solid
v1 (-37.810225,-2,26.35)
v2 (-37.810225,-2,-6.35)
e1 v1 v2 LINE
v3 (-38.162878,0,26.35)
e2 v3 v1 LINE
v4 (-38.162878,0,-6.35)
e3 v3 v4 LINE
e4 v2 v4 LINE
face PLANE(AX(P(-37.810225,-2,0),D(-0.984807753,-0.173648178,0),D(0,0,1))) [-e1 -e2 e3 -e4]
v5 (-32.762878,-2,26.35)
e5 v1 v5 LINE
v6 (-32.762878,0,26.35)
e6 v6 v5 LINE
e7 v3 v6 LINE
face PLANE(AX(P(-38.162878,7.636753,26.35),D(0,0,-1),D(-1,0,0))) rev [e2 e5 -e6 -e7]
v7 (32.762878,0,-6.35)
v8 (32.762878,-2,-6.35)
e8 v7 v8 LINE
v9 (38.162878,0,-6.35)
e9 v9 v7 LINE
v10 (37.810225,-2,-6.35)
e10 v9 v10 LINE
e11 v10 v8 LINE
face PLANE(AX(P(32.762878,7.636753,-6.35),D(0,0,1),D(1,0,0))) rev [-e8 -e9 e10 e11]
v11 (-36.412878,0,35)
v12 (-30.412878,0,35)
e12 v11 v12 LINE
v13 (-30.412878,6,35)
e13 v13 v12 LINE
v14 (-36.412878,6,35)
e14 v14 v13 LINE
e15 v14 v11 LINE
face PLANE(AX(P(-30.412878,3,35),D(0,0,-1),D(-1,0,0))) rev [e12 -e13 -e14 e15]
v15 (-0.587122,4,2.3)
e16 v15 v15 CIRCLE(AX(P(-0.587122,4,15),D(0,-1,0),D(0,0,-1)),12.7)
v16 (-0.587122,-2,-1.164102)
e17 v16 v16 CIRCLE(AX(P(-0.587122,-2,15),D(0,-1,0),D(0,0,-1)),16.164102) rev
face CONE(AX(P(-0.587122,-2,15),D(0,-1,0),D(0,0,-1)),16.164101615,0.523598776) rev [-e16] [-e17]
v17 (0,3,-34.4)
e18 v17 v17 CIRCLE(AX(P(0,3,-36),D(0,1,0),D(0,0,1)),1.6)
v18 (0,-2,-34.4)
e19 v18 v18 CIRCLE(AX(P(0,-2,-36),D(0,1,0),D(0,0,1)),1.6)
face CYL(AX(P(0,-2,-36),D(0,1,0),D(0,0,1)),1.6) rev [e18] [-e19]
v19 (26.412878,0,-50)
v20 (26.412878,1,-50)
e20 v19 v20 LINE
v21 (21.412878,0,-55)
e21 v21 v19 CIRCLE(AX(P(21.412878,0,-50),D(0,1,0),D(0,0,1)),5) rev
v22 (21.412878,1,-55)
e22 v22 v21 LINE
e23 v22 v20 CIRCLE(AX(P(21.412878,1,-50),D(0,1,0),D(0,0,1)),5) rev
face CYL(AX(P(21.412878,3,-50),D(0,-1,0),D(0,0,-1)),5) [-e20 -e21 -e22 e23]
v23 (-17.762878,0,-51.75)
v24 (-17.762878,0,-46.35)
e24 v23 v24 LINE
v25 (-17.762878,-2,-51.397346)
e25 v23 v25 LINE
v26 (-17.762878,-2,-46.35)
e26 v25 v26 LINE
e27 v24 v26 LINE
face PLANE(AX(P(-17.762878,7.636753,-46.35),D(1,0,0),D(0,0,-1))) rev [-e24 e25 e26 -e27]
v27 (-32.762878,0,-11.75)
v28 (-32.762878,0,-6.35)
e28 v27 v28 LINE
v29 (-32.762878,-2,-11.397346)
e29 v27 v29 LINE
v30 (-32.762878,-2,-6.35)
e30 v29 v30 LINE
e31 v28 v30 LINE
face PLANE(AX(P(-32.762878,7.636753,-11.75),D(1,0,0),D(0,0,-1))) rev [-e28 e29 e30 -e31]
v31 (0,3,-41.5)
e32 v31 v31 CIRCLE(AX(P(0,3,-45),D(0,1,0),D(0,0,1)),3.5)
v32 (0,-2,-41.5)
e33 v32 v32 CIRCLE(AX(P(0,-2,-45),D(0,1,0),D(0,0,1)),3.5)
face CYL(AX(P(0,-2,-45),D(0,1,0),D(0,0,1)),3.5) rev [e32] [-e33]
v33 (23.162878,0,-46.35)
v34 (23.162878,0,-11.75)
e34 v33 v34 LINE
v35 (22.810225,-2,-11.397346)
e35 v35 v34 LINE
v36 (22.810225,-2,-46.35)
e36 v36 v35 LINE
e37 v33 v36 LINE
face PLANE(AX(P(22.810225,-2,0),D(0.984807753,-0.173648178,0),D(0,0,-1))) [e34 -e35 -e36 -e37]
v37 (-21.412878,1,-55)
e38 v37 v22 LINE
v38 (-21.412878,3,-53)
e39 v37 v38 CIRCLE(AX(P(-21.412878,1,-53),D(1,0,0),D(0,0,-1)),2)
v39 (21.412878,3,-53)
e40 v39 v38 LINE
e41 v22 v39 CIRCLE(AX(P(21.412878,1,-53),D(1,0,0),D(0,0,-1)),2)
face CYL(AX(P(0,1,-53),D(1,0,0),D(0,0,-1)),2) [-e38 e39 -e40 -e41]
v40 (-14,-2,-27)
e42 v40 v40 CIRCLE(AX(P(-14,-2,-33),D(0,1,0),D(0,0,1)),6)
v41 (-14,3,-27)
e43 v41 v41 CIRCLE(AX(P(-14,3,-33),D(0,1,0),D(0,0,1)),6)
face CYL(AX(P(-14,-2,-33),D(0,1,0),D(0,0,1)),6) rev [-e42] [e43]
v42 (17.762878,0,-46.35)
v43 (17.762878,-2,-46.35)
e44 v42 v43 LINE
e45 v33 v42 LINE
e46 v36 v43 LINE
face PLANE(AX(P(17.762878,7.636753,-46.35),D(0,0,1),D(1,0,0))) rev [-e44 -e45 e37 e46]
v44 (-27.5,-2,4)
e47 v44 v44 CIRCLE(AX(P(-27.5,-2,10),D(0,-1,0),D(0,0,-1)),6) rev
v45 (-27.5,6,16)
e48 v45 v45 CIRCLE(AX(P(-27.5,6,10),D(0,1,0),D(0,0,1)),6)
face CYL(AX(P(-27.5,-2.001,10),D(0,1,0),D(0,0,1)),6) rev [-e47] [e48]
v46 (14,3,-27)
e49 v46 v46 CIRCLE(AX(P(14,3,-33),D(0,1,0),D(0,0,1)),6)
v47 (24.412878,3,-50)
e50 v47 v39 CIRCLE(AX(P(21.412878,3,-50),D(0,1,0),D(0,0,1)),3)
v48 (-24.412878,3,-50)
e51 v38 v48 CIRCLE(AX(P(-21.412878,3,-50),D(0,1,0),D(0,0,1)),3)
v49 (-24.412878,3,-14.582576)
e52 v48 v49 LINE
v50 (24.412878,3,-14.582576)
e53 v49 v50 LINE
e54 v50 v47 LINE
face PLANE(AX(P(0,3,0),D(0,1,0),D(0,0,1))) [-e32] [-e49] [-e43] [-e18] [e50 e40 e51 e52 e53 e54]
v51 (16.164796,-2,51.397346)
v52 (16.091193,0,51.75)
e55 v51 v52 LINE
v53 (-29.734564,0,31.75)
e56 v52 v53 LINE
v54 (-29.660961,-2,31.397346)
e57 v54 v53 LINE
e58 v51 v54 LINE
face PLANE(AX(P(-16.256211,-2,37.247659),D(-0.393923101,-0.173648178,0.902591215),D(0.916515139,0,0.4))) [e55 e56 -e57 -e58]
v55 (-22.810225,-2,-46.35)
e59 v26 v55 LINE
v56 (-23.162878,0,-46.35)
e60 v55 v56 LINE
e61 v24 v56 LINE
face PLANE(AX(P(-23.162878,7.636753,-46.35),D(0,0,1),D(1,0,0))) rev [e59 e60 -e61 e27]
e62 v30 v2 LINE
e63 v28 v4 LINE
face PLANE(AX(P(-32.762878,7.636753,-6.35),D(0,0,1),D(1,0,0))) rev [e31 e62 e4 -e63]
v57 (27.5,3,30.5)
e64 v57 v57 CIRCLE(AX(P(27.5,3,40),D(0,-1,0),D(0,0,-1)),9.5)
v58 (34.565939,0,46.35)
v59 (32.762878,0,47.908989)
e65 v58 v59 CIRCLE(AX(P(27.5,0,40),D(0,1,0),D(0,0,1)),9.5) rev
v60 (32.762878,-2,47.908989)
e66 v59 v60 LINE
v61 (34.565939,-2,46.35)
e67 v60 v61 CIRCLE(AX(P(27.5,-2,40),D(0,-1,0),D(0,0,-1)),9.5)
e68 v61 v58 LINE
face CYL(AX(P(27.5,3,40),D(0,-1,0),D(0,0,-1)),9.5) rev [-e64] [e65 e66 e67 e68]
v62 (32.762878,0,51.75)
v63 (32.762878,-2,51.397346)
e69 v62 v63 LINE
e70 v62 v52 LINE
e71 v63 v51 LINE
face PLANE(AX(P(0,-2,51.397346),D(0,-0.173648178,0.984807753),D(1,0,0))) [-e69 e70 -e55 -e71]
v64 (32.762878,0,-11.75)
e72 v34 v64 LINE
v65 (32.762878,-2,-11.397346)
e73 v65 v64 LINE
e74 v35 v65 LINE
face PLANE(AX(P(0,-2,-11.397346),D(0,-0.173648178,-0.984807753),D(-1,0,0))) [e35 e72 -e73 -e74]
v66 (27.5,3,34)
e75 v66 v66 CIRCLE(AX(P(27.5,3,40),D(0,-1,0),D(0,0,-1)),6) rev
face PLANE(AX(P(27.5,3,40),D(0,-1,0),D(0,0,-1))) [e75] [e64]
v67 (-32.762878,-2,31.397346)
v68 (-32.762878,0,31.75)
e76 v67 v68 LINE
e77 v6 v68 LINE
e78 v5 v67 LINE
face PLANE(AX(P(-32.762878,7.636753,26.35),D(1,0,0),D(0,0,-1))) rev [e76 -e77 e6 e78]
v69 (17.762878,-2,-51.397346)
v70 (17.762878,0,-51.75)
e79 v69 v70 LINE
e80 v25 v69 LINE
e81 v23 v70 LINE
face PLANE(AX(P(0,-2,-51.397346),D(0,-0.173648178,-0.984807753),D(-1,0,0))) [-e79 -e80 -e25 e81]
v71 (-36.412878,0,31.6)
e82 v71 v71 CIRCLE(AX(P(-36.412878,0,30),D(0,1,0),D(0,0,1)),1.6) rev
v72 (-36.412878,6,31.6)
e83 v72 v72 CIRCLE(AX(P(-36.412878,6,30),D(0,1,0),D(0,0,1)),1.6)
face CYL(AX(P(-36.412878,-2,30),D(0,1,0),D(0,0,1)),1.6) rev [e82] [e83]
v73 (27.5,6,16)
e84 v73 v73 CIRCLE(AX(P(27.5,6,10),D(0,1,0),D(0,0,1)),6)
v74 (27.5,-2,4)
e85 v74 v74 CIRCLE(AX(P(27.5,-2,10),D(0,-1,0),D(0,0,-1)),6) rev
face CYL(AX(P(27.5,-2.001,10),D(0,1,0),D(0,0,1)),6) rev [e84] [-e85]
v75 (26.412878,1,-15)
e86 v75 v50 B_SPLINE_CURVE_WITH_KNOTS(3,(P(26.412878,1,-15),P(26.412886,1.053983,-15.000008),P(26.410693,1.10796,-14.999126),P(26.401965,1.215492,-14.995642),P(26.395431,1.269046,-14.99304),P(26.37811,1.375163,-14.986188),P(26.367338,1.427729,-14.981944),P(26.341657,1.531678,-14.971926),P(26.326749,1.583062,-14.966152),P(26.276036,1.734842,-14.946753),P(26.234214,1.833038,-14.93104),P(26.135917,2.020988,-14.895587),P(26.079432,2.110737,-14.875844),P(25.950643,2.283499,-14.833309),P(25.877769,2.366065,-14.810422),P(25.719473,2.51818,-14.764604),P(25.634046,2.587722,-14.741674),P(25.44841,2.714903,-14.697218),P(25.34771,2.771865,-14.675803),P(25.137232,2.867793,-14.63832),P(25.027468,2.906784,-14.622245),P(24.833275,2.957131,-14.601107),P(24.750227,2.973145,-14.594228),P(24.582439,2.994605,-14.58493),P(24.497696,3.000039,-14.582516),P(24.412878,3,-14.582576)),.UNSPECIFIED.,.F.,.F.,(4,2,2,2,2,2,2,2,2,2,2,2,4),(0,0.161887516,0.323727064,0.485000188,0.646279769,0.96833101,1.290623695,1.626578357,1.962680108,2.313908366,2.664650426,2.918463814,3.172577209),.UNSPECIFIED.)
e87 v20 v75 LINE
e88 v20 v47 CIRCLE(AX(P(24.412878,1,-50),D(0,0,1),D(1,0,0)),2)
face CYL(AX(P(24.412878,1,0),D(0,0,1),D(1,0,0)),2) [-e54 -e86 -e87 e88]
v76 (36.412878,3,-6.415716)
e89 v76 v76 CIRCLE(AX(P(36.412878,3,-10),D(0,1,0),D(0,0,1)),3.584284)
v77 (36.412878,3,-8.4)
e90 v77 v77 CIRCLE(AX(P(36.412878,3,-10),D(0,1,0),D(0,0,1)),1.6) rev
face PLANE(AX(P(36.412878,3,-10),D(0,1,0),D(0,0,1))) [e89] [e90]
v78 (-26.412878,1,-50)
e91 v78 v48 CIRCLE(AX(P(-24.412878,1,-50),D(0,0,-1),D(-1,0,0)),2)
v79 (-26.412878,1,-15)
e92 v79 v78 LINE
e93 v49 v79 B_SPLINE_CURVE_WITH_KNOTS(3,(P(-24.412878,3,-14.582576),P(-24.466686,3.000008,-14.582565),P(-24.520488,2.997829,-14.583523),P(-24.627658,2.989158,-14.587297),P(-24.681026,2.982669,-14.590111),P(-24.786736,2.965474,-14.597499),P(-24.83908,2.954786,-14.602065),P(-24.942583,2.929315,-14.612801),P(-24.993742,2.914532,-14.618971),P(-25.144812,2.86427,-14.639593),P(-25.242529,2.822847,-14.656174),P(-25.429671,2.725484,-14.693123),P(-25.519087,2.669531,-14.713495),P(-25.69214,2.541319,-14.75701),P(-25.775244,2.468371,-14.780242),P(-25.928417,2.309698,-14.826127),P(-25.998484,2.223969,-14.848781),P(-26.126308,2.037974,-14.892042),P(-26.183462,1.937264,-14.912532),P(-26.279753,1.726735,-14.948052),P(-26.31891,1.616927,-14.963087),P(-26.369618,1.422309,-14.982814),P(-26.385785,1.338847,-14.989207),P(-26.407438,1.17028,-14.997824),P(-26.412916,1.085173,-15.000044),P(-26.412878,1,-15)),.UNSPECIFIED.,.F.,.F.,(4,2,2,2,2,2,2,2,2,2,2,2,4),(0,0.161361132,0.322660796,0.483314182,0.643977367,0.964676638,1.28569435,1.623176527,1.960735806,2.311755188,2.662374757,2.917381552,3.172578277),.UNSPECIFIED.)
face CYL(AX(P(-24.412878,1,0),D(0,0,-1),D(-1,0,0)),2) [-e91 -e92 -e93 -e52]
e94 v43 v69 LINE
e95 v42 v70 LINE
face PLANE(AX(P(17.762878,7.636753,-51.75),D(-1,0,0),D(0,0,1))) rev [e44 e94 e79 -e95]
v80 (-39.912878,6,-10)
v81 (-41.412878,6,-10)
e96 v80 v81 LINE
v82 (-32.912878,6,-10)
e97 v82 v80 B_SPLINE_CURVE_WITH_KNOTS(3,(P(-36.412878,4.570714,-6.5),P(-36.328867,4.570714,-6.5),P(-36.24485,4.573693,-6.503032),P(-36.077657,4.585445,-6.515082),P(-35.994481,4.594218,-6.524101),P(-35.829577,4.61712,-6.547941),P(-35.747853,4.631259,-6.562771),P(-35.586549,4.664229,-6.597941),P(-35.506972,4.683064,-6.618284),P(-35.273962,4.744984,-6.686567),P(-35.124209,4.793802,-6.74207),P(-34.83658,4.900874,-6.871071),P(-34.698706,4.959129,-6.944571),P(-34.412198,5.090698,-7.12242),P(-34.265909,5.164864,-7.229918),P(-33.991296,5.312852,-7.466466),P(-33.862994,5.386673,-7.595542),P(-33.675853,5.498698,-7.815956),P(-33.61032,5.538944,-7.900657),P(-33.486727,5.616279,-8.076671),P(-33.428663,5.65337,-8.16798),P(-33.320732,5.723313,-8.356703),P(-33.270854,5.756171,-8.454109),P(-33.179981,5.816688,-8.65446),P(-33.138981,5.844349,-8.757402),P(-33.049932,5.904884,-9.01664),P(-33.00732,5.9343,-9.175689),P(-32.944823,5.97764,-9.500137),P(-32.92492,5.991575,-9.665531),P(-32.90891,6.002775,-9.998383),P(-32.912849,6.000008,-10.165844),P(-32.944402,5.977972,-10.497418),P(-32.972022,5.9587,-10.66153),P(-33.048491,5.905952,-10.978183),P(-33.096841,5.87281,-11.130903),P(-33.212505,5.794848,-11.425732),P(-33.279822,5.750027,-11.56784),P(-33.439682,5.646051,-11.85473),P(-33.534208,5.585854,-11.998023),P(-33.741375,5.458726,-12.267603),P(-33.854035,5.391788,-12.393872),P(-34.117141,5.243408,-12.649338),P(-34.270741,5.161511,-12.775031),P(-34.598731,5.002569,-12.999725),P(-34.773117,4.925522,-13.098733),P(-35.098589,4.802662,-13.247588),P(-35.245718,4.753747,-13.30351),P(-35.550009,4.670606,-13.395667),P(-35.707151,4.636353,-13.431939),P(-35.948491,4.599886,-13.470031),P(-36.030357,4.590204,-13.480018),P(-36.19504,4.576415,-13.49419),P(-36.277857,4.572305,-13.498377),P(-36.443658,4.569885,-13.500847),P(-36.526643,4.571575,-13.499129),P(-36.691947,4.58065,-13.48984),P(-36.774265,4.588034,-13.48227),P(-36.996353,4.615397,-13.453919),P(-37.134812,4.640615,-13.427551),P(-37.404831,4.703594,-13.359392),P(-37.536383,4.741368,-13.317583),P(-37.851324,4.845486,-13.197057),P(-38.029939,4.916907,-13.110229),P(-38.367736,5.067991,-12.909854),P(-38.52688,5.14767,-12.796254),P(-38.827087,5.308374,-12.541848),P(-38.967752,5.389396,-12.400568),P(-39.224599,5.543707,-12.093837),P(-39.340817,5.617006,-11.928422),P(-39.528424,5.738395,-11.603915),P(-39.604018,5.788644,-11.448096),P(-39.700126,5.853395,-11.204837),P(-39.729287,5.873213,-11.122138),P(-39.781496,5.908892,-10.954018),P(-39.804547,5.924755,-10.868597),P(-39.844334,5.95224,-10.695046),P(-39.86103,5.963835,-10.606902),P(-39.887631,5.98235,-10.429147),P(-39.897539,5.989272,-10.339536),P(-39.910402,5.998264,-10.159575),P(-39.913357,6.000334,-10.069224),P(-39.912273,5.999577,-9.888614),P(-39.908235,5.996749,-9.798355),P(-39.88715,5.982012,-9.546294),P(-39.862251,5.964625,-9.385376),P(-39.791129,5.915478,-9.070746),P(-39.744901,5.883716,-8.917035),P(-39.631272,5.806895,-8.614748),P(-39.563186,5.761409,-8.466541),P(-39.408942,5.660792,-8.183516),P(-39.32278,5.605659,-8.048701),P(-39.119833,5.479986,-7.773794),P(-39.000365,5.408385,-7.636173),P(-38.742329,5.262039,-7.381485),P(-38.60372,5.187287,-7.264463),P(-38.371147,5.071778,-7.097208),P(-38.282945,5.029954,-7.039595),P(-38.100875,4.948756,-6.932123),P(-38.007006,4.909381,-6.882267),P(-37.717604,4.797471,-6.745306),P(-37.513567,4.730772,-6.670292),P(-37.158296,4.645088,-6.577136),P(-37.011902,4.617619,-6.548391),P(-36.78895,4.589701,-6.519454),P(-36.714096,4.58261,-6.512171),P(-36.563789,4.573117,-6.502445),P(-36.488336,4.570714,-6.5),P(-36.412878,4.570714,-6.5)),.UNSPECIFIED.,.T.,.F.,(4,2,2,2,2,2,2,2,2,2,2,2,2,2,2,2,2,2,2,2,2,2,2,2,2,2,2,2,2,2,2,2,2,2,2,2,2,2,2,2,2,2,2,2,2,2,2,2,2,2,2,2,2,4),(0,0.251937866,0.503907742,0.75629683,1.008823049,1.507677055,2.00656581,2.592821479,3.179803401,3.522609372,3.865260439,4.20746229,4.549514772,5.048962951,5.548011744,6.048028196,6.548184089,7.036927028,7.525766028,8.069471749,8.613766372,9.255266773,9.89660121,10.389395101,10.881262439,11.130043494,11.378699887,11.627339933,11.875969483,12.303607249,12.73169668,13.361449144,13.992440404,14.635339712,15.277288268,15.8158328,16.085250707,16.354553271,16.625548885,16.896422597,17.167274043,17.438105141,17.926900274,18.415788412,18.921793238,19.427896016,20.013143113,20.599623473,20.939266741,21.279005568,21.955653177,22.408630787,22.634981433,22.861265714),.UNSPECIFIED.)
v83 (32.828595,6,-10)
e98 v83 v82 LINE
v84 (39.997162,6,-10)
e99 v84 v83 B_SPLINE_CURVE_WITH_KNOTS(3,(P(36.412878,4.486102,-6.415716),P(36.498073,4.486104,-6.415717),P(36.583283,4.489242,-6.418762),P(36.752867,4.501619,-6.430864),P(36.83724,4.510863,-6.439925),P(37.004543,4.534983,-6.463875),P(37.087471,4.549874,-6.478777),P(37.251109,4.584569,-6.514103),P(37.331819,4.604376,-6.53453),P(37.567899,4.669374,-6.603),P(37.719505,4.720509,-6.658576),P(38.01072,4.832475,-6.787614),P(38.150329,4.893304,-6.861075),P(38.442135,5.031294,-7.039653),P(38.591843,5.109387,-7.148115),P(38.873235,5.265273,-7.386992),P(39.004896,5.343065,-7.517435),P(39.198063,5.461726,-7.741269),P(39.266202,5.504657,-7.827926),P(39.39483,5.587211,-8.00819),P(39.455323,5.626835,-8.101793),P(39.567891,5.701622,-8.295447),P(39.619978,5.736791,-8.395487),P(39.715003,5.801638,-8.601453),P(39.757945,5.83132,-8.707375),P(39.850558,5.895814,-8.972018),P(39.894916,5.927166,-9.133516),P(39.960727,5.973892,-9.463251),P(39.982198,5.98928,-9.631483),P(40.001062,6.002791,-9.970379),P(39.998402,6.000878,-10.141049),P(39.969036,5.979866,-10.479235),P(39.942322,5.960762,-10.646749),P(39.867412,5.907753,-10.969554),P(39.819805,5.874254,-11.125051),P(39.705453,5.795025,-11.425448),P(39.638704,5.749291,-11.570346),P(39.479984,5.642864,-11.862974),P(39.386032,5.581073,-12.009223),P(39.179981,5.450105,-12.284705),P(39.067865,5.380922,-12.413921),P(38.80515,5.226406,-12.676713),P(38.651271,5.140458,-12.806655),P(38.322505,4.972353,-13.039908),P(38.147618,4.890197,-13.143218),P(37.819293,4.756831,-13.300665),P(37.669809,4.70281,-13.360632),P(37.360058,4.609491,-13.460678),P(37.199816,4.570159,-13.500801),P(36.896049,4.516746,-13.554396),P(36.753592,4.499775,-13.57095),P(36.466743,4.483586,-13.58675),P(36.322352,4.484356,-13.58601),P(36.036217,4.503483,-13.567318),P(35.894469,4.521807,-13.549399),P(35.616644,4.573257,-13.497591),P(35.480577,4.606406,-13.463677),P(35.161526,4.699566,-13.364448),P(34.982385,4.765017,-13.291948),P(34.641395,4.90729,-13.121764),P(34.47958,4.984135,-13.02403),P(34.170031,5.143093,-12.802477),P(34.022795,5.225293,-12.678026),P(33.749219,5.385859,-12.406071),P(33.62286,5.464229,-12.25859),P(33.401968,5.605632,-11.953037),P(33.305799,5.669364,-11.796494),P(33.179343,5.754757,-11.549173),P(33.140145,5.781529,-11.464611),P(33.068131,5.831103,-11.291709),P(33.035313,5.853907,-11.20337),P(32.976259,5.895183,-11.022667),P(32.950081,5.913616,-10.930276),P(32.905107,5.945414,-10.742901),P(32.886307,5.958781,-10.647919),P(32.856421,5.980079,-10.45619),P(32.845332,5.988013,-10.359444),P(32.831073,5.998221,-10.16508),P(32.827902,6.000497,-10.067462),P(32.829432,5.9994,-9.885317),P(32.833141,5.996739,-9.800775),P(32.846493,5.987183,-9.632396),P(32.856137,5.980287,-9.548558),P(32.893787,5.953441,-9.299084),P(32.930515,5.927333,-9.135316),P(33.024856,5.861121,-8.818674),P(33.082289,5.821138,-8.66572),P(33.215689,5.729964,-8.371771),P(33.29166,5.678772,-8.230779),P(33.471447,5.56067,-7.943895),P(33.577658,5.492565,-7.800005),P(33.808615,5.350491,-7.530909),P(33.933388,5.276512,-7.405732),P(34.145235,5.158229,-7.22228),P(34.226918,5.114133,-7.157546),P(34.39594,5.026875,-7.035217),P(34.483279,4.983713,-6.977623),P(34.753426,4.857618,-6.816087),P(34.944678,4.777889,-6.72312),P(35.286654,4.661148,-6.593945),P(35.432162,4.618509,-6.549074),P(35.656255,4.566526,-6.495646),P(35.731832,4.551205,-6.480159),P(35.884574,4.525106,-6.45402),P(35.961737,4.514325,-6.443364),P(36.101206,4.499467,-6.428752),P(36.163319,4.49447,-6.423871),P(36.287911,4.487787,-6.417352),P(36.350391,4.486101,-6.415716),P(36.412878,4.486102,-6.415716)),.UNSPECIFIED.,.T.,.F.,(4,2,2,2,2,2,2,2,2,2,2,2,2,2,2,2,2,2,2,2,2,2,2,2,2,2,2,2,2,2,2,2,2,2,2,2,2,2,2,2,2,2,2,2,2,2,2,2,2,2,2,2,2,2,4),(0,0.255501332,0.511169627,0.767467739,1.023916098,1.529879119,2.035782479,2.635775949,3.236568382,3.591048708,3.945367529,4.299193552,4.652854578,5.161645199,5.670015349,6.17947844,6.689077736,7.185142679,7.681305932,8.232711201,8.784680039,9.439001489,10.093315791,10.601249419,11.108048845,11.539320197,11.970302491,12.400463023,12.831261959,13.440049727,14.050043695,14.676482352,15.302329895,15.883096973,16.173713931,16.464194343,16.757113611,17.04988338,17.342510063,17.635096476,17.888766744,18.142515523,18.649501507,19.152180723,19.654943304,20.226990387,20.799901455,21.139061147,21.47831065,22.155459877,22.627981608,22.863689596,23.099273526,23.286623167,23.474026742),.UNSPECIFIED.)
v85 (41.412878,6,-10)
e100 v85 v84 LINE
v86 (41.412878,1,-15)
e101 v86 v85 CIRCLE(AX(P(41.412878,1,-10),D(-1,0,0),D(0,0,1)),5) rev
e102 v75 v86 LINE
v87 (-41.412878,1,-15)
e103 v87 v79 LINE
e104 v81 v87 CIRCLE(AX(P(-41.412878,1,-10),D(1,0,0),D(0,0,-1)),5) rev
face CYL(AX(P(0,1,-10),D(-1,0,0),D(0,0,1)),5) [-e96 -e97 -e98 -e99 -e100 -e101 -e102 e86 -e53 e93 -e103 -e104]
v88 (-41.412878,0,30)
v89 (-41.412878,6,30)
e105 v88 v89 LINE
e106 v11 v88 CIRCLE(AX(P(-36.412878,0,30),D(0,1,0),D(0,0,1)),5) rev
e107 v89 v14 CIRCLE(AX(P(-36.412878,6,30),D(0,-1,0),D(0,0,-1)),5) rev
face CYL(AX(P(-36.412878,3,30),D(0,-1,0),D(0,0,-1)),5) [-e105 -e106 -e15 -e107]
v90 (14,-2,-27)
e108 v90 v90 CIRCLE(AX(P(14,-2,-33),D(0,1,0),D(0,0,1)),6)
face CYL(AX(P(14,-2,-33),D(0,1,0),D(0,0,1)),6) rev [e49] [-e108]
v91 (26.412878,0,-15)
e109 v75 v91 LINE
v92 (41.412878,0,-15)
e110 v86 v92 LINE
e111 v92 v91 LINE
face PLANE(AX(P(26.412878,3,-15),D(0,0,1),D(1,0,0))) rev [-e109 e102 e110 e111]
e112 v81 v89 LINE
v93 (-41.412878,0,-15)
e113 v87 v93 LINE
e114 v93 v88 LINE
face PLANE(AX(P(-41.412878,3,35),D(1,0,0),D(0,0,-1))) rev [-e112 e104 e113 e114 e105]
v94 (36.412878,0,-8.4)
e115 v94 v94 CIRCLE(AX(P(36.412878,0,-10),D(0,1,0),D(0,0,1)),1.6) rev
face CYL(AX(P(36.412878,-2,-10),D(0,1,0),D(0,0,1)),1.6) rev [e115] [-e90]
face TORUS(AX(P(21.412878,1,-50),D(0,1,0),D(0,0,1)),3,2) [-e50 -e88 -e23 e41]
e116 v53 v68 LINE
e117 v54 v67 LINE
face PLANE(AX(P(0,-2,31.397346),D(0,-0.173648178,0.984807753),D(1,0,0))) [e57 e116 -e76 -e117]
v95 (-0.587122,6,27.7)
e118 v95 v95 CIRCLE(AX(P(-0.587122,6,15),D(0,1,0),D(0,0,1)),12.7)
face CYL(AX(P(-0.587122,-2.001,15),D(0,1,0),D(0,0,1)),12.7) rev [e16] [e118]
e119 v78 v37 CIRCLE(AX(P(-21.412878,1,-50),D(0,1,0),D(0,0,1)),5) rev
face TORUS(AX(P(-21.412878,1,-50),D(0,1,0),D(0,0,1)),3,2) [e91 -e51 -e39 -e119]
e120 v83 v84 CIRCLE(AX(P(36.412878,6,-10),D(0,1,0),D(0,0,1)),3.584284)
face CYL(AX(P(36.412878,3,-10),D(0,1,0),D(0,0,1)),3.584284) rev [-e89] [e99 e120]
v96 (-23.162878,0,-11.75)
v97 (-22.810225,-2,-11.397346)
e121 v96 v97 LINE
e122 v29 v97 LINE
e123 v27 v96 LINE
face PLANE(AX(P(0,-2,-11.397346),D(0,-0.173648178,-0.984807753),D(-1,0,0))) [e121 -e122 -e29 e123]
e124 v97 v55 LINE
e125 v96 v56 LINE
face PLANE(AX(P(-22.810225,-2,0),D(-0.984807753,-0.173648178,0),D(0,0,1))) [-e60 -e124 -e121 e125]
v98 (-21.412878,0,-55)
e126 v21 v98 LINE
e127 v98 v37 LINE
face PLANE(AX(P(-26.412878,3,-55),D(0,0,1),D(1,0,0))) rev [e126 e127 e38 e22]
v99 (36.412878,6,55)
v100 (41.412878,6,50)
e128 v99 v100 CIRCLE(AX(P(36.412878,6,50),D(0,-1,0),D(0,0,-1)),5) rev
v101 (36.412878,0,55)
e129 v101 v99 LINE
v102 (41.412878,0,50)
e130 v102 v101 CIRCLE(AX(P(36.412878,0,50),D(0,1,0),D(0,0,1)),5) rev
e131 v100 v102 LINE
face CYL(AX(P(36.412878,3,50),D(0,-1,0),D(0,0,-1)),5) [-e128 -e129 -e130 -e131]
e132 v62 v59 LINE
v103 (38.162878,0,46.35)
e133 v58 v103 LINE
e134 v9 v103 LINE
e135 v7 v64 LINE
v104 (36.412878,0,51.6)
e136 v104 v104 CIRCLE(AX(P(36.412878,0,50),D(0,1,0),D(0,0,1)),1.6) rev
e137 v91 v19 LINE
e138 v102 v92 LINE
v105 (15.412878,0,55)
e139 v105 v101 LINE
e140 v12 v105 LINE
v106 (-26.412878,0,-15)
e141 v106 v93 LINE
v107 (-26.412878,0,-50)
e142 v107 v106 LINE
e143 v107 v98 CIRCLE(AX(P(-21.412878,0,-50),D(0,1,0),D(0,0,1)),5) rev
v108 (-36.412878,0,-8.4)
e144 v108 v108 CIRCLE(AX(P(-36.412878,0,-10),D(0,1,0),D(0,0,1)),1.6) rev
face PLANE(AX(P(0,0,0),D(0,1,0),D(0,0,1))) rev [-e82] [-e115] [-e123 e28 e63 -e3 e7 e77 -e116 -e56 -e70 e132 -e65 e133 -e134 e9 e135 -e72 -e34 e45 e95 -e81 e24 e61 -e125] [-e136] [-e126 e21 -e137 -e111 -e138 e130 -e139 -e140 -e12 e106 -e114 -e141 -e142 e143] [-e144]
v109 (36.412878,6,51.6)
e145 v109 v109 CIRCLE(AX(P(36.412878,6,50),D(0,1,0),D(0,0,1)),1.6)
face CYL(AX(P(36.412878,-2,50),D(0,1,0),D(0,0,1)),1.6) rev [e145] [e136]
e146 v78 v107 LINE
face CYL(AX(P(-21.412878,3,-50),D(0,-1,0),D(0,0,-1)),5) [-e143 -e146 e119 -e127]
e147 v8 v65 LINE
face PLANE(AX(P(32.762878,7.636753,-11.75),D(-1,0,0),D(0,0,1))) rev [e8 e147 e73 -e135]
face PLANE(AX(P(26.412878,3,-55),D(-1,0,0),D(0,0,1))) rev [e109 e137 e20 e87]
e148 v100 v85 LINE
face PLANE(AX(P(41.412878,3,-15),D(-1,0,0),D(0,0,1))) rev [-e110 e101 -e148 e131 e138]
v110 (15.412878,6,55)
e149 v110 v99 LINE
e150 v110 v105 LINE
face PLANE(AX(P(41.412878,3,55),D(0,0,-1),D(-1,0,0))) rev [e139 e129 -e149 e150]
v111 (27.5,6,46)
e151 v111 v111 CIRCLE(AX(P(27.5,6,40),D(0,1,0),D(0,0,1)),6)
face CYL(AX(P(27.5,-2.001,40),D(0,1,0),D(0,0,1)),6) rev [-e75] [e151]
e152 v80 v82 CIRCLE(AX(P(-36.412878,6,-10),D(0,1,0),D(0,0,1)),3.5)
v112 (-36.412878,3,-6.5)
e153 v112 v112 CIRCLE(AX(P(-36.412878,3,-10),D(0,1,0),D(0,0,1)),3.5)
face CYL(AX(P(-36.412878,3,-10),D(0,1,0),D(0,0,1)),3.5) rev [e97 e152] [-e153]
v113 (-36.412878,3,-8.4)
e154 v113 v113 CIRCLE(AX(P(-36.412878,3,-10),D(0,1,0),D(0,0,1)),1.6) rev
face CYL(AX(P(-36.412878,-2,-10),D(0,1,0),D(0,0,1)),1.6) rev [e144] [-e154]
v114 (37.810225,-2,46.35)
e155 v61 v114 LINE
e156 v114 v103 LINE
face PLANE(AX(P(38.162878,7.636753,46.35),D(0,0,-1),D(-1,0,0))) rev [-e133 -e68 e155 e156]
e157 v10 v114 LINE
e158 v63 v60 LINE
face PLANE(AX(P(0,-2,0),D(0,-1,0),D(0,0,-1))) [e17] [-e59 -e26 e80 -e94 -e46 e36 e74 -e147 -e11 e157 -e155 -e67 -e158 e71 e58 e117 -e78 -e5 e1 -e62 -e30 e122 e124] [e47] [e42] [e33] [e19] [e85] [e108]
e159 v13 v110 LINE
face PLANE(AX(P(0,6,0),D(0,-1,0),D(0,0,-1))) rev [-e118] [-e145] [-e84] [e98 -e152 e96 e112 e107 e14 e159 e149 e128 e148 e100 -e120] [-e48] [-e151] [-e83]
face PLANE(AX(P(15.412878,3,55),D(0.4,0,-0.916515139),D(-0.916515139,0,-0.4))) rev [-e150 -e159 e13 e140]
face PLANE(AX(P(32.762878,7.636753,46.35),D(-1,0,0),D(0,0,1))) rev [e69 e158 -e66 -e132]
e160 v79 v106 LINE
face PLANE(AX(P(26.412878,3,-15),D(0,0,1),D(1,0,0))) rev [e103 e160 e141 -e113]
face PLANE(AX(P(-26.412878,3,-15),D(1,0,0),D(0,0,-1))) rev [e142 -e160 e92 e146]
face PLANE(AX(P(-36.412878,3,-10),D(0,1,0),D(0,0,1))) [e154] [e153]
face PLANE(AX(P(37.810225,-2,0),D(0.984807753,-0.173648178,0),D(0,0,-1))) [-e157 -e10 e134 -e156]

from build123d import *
from OCP.BRepFilletAPI import BRepFilletAPI_MakeChamfer

# Parameters (mm, degrees)
BOSS_EXTRUDE1_DEPTH = 3
BOSS_EXTRUDE2_DEPTH = 2
CHAMFER1_SIZE       = 2
CHAMFER1_SIZE_2     = 0.352653961
SKETCH3_R           = 6
SKETCH3_R_2         = 3.5
SKETCH3_R_3         = 1.6
CUT_EXTRUDE1_DEPTH  = 70.029171396
BOSS_EXTRUDE3_DEPTH = 3
FILLET1_R           = 5
CUT_EXTRUDE3_REACH  = 71.311
SKETCH6_R           = 12.7
SKETCH6_R_2         = 6
SKETCH7_R           = 9.5
CUT_EXTRUDE4_DEPTH  = 5
CHAMFER2_SIZE       = 6
CHAMFER2_SIZE2      = 3.464101615
FILLET2_R           = 5
FILLET3_R           = 2
SKETCH9_R           = 1.6
CUT_EXTRUDE5_DEPTH  = 70.311085058
SKETCH10_R          = 3.5
SKETCH10_R_2        = 3.584283701
CUT_EXTRUDE6_DEPTH  = 3
SKETCH11_W          = 5.4
SKETCH11_H          = 5.4
CUT_EXTRUDE7_DEPTH  = 2


# Some blends are built 0.0001 mm under size
with BuildPart() as part:
    # Sketch1 → Boss-Extrude1 (new body)
    with BuildSketch(Plane(origin=(0, 0, 0), x_dir=(1, 0, 0), z_dir=(0, 1, 0))):
        Polygon((-26.412878475, 15), (-26.412878475, 55), (26.412878475, 55), (26.412878475, 15), (41.412878475, 15), (41.412878475, -55), (15.412878475, -55), (-30.412878475, -35), (-41.412878475, -35), (-41.412878475, 15), align=None)
    extrude(amount=BOSS_EXTRUDE1_DEPTH)

    # Sketch2 → Boss-Extrude2 (add)
    with BuildSketch(Plane.XZ):
        Polygon((-38.162878475, 31.75), (-38.162878475, -11.75), (-23.162878475, -11.75), (-23.162878475, -51.75), (23.162878475, -51.75), (23.162878475, -11.75), (38.162878475, -11.75), (38.162878475, 51.75), (16.09119297, 51.75), (-29.734563979, 31.75), align=None)
    extrude(amount=BOSS_EXTRUDE2_DEPTH)

    # Chamfer1
    chamfer1_edges_1 = [part.edges().sort_by_distance(p)[0] for p in [
        (-33.948721227, -2, 31.75),
    ]]
    chamfer1_side_1 = [part.faces().sort_by_distance(p)[0] for p in [
        (-33.948721227, -1.992946921, 31.75),
    ]]
    chamfer1_edges_2 = [part.edges().sort_by_distance(p)[0] for p in [
        (-6.821685504, -2, 41.75),
    ]]
    chamfer1_side_2 = [part.faces().sort_by_distance(p)[0] for p in [
        (-6.821685504, -1.992946921, 41.75),
    ]]
    chamfer1_edges_3 = [part.edges().sort_by_distance(p)[0] for p in [
        (27.127035723, -2, 51.75),
    ]]
    chamfer1_side_3 = [part.faces().sort_by_distance(p)[0] for p in [
        (27.127035723, -1.992946921, 51.75),
    ]]
    chamfer1_edges_4 = [part.edges().sort_by_distance(p)[0] for p in [
        (38.162878475, -2, 20),
    ]]
    chamfer1_side_4 = [part.faces().sort_by_distance(p)[0] for p in [
        (38.162878475, -1.992946921, 20),
    ]]
    chamfer1_edges_5 = [part.edges().sort_by_distance(p)[0] for p in [
        (30.662878475, -2, -11.75),
    ]]
    chamfer1_side_5 = [part.faces().sort_by_distance(p)[0] for p in [
        (30.662878475, -1.992946921, -11.75),
    ]]
    chamfer1_edges_6 = [part.edges().sort_by_distance(p)[0] for p in [
        (23.162878475, -2, -31.75),
    ]]
    chamfer1_side_6 = [part.faces().sort_by_distance(p)[0] for p in [
        (23.162878475, -1.992946921, -31.75),
    ]]
    chamfer1_edges_7 = [part.edges().sort_by_distance(p)[0] for p in [
        (0, -2, -51.75),
    ]]
    chamfer1_side_7 = [part.faces().sort_by_distance(p)[0] for p in [
        (0, -1.992946921, -51.75),
    ]]
    chamfer1_edges_8 = [part.edges().sort_by_distance(p)[0] for p in [
        (-23.162878475, -2, -31.75),
    ]]
    chamfer1_side_8 = [part.faces().sort_by_distance(p)[0] for p in [
        (-23.162878475, -1.992946921, -31.75),
    ]]
    chamfer1_edges_9 = [part.edges().sort_by_distance(p)[0] for p in [
        (-30.662878475, -2, -11.75),
    ]]
    chamfer1_side_9 = [part.faces().sort_by_distance(p)[0] for p in [
        (-30.662878475, -1.992946921, -11.75),
    ]]
    chamfer1_edges_10 = [part.edges().sort_by_distance(p)[0] for p in [
        (-38.162878475, -2, 10),
    ]]
    chamfer1_side_10 = [part.faces().sort_by_distance(p)[0] for p in [
        (-38.162878475, -1.992946921, 10),
    ]]
    chamfer1 = BRepFilletAPI_MakeChamfer(part.part.solid().wrapped)
    for e in chamfer1_edges_1:
        chamfer1.Add(CHAMFER1_SIZE - 0.0001, CHAMFER1_SIZE_2 - 0.0001, e.wrapped, chamfer1_side_1[0].wrapped)
    for e in chamfer1_edges_2:
        chamfer1.Add(CHAMFER1_SIZE - 0.0001, CHAMFER1_SIZE_2 - 0.0001, e.wrapped, chamfer1_side_2[0].wrapped)
    for e in chamfer1_edges_3:
        chamfer1.Add(CHAMFER1_SIZE - 0.0001, CHAMFER1_SIZE_2 - 0.0001, e.wrapped, chamfer1_side_3[0].wrapped)
    for e in chamfer1_edges_4:
        chamfer1.Add(CHAMFER1_SIZE - 0.0001, CHAMFER1_SIZE_2 - 0.0001, e.wrapped, chamfer1_side_4[0].wrapped)
    for e in chamfer1_edges_5:
        chamfer1.Add(CHAMFER1_SIZE - 0.0001, CHAMFER1_SIZE_2 - 0.0001, e.wrapped, chamfer1_side_5[0].wrapped)
    for e in chamfer1_edges_6:
        chamfer1.Add(CHAMFER1_SIZE - 0.0001, CHAMFER1_SIZE_2 - 0.0001, e.wrapped, chamfer1_side_6[0].wrapped)
    for e in chamfer1_edges_7:
        chamfer1.Add(CHAMFER1_SIZE - 0.0001, CHAMFER1_SIZE_2 - 0.0001, e.wrapped, chamfer1_side_7[0].wrapped)
    for e in chamfer1_edges_8:
        chamfer1.Add(CHAMFER1_SIZE - 0.0001, CHAMFER1_SIZE_2 - 0.0001, e.wrapped, chamfer1_side_8[0].wrapped)
    for e in chamfer1_edges_9:
        chamfer1.Add(CHAMFER1_SIZE - 0.0001, CHAMFER1_SIZE_2 - 0.0001, e.wrapped, chamfer1_side_9[0].wrapped)
    for e in chamfer1_edges_10:
        chamfer1.Add(CHAMFER1_SIZE - 0.0001, CHAMFER1_SIZE_2 - 0.0001, e.wrapped, chamfer1_side_10[0].wrapped)
    add(Compound.cast(chamfer1.Shape()), mode=Mode.REPLACE)  # a hair under: the kernel refuses the full size

    # Sketch3 → Cut-Extrude1 (cut, through all)
    with BuildSketch(Plane(origin=(0, 3, 0), x_dir=(1, 0, 0), z_dir=(0, 1, 0))):
        with Locations(Location((-14, 33, 0), (0, 0, 270))):
            Circle(SKETCH3_R)
        with Locations(Location((14, 33, 0), (0, 0, 270))):
            Circle(SKETCH3_R)
        with Locations(Location((0, 45, 0), (0, 0, 270))):
            Circle(SKETCH3_R_2)
        with Locations(Location((0, 36, 0), (0, 0, 270))):
            Circle(SKETCH3_R_3)
    extrude(amount=-CUT_EXTRUDE1_DEPTH, mode=Mode.SUBTRACT)

    # Sketch4 → Boss-Extrude3 (add)
    with BuildSketch(Plane(origin=(0, 3, 0), x_dir=(1, 0, 0), z_dir=(0, 1, 0))):
        Polygon((-41.412878475, 15), (41.412878475, 15), (41.412878475, -55), (15.412878475, -55), (-30.412878475, -35), (-41.412878475, -35), align=None)
    extrude(amount=BOSS_EXTRUDE3_DEPTH)

    # Fillet1
    # the kernel refuses this fillet: 5 mm, written as the material it takes off along each edge
    with BuildSketch(Plane(origin=(-53.912878475, 6, -15), x_dir=(0, -1, 0), z_dir=(1, 0, 0))) as fillet1_piece_1_section:
        with BuildLine():
            CenterArc((FILLET1_R, -FILLET1_R), FILLET1_R, 90, 90)
            Line((0, -FILLET1_R), (0, 0))
            Line((0, 0), (FILLET1_R, 0))
        make_face()
    fillet1_piece_1 = extrude(amount=107.82575695, mode=Mode.PRIVATE)
    fillet1_piece_1 = split(fillet1_piece_1, bisect_by=Plane(origin=(-40.162878475, 3, -14.94934076), z_dir=(0, -1, 0)), keep=Keep.TOP, mode=Mode.PRIVATE)
    fillet1_piece_1 = split(fillet1_piece_1, bisect_by=Plane(origin=(-26.412878475, 2.291256669, -14.94934076), z_dir=(-1, 0, 0)), keep=Keep.TOP, mode=Mode.PRIVATE)
    add(fillet1_piece_1, mode=Mode.SUBTRACT)
    with BuildSketch(Plane(origin=(-53.912878475, 6, -15), x_dir=(0, -1, 0), z_dir=(1, 0, 0))) as fillet1_piece_2_section:
        with BuildLine():
            CenterArc((FILLET1_R, -FILLET1_R), FILLET1_R, 90, 90)
            Line((0, -FILLET1_R), (0, 0))
            Line((0, 0), (FILLET1_R, 0))
        make_face()
    fillet1_piece_2 = extrude(amount=107.82575695, mode=Mode.PRIVATE)
    fillet1_piece_2 = split(fillet1_piece_2, bisect_by=Plane(origin=(-40.162878475, 3, -13.781274122), z_dir=(0, 1, 0)), keep=Keep.TOP, mode=Mode.PRIVATE)
    fillet1_piece_2 = split(fillet1_piece_2, bisect_by=Plane(origin=(-26.412878475, 5.074749682, -13.781274122), z_dir=(-1, 0, 0)), keep=Keep.TOP, mode=Mode.PRIVATE)
    add(fillet1_piece_2, mode=Mode.SUBTRACT)
    with BuildSketch(Plane(origin=(-53.912878475, 6, -15), x_dir=(0, -1, 0), z_dir=(1, 0, 0))) as fillet1_piece_3_section:
        with BuildLine():
            CenterArc((FILLET1_R, -FILLET1_R), FILLET1_R, 90, 90)
            Line((0, -FILLET1_R), (0, 0))
            Line((0, 0), (FILLET1_R, 0))
        make_face()
    fillet1_piece_3 = extrude(amount=107.82575695, mode=Mode.PRIVATE)
    fillet1_piece_3 = split(fillet1_piece_3, bisect_by=Plane(origin=(0, 3, -13.781274122), z_dir=(0, 1, 0)), keep=Keep.TOP, mode=Mode.PRIVATE)
    fillet1_piece_3 = split(fillet1_piece_3, bisect_by=Plane(origin=(-26.412878475, 5.074749682, -13.781274122), z_dir=(1, 0, 0)), keep=Keep.TOP, mode=Mode.PRIVATE)
    fillet1_piece_3 = split(fillet1_piece_3, bisect_by=Plane(origin=(26.412878475, 5.074749682, -13.781274122), z_dir=(-1, 0, 0)), keep=Keep.TOP, mode=Mode.PRIVATE)
    add(fillet1_piece_3, mode=Mode.SUBTRACT)
    with BuildSketch(Plane(origin=(-53.912878475, 6, -15), x_dir=(0, -1, 0), z_dir=(1, 0, 0))) as fillet1_piece_4_section:
        with BuildLine():
            CenterArc((FILLET1_R, -FILLET1_R), FILLET1_R, 90, 90)
            Line((0, -FILLET1_R), (0, 0))
            Line((0, 0), (FILLET1_R, 0))
        make_face()
    fillet1_piece_4 = extrude(amount=107.82575695, mode=Mode.PRIVATE)
    fillet1_piece_4 = split(fillet1_piece_4, bisect_by=Plane(origin=(40.162878475, 3, -14.94934076), z_dir=(0, -1, 0)), keep=Keep.TOP, mode=Mode.PRIVATE)
    fillet1_piece_4 = split(fillet1_piece_4, bisect_by=Plane(origin=(26.412878475, 2.291256669, -14.94934076), z_dir=(1, 0, 0)), keep=Keep.TOP, mode=Mode.PRIVATE)
    add(fillet1_piece_4, mode=Mode.SUBTRACT)
    with BuildSketch(Plane(origin=(-53.912878475, 6, -15), x_dir=(0, -1, 0), z_dir=(1, 0, 0))) as fillet1_piece_5_section:
        with BuildLine():
            CenterArc((FILLET1_R, -FILLET1_R), FILLET1_R, 90, 90)
            Line((0, -FILLET1_R), (0, 0))
            Line((0, 0), (FILLET1_R, 0))
        make_face()
    fillet1_piece_5 = extrude(amount=107.82575695, mode=Mode.PRIVATE)
    fillet1_piece_5 = split(fillet1_piece_5, bisect_by=Plane(origin=(40.162878475, 3, -13.781274122), z_dir=(0, 1, 0)), keep=Keep.TOP, mode=Mode.PRIVATE)
    fillet1_piece_5 = split(fillet1_piece_5, bisect_by=Plane(origin=(26.412878475, 5.074749682, -13.781274122), z_dir=(1, 0, 0)), keep=Keep.TOP, mode=Mode.PRIVATE)
    add(fillet1_piece_5, mode=Mode.SUBTRACT)

    # Sketch6 → Cut-Extrude3 (cut, up to next)
    with BuildSketch(Plane(origin=(0, 6, 0), x_dir=(1, 0, 0), z_dir=(0, 1, 0)), mode=Mode.PRIVATE) as cut_extrude3_sk1:
        with Locations(Location((-0.587121525, -15, 0), (0, 0, 270))):
            Circle(SKETCH6_R)
    cut_extrude3_tool1 = extrude(cut_extrude3_sk1.sketch, amount=-CUT_EXTRUDE3_REACH, mode=Mode.PRIVATE) & part.part
    # Sketch6 → Cut-Extrude3 (cut, up to next)
    with BuildSketch(Plane(origin=(0, 6, 0), x_dir=(1, 0, 0), z_dir=(0, 1, 0)), mode=Mode.PRIVATE) as cut_extrude3_sk2:
        with Locations(Location((-27.5, -10, 0), (0, 0, 270))):
            Circle(SKETCH6_R_2)
    cut_extrude3_tool2 = extrude(cut_extrude3_sk2.sketch, amount=-CUT_EXTRUDE3_REACH, mode=Mode.PRIVATE) & part.part
    # Sketch6 → Cut-Extrude3 (cut, up to next)
    with BuildSketch(Plane(origin=(0, 6, 0), x_dir=(1, 0, 0), z_dir=(0, 1, 0)), mode=Mode.PRIVATE) as cut_extrude3_sk3:
        with Locations(Location((27.5, -10, 0), (0, 0, 270))):
            Circle(SKETCH6_R_2)
    cut_extrude3_tool3 = extrude(cut_extrude3_sk3.sketch, amount=-CUT_EXTRUDE3_REACH, mode=Mode.PRIVATE) & part.part
    # Sketch6 → Cut-Extrude3 (cut, up to next)
    with BuildSketch(Plane(origin=(0, 6, 0), x_dir=(1, 0, 0), z_dir=(0, 1, 0)), mode=Mode.PRIVATE) as cut_extrude3_sk4:
        with Locations(Location((27.5, -40, 0), (0, 0, 270))):
            Circle(SKETCH6_R_2)
    cut_extrude3_tool4 = extrude(cut_extrude3_sk4.sketch, amount=-CUT_EXTRUDE3_REACH, mode=Mode.PRIVATE) & part.part
    add(cut_extrude3_tool1.solids().sort_by_distance((-0.587122, 6, 15))[0], mode=Mode.SUBTRACT)
    add(cut_extrude3_tool2.solids().sort_by_distance((-27.5, 6, 10))[0], mode=Mode.SUBTRACT)
    add(cut_extrude3_tool3.solids().sort_by_distance((27.5, 6, 10))[0], mode=Mode.SUBTRACT)
    add(cut_extrude3_tool4.solids().sort_by_distance((27.5, 6, 40))[0], mode=Mode.SUBTRACT)

    # Sketch7 → Cut-Extrude4 (cut)
    with BuildSketch(Plane.XZ.offset(2)):
        with Locations(Location((27.5, 40, 0), (0, 0, 270))):
            Circle(SKETCH7_R)
    extrude(amount=-CUT_EXTRUDE4_DEPTH, mode=Mode.SUBTRACT)

    # Chamfer2
    chamfer2_edges = [part.edges().sort_by_distance(p)[0] for p in [
        (-0.587121525, -2, 2.3),
    ]]
    chamfer2_side = [part.faces().sort_by_distance(p)[0] for p in [
        (-0.587121525, 2, 2.3),
    ]]
    chamfer(chamfer2_edges, length=CHAMFER2_SIZE, length2=CHAMFER2_SIZE2, reference=chamfer2_side[0])

    # Fillet2
    fillet2_edges = [part.edges().sort_by_distance(p)[0] for p in [
        (-26.412878475, 1.5, -55),
        (26.412878475, 1.5, -55),
        (41.412878475, 3, 55),
        (-41.412878475, 3, 35),
    ]]
    fillet(fillet2_edges, radius=FILLET2_R)

    # Fillet3
    fillet3_edges = [part.edges().sort_by_distance(p)[0] for p in [
        (26.412878475, 3, -32.291287847),
        (24.948412381, 3, -53.535533906),
        (0, 3, -55),
        (-24.948412381, 3, -53.535533906),
        (-26.412878475, 3, -32.291287847),
    ]]
    fillet(fillet3_edges, radius=FILLET3_R)

    # Sketch9 → Cut-Extrude5 (cut, through all)
    with BuildSketch(Plane(origin=(0, 6, 0), x_dir=(1, 0, 0), z_dir=(0, 1, 0))):
        with Locations(Location((36.412878475, -50, 0), (0, 0, 270))):
            Circle(SKETCH9_R)
        with Locations(Location((-36.412878475, -30, 0), (0, 0, 270))):
            Circle(SKETCH9_R)
        with Locations(Location((36.412878475, 10, 0), (0, 0, 330.849269712))):
            Circle(SKETCH9_R)
        with Locations(Location((-36.412878475, 10, 0), (0, 0, 209.150730288))):
            Circle(SKETCH9_R)
    extrude(amount=-CUT_EXTRUDE5_DEPTH, mode=Mode.SUBTRACT)

    # Sketch10 → Cut-Extrude6 (cut)
    with BuildSketch(Plane(origin=(0, 6, 0), x_dir=(1, 0, 0), z_dir=(0, 1, 0))):
        with Locations(Location((-36.412878475, 10, 0), (0, 0, 270))):
            Circle(SKETCH10_R)
        with Locations(Location((36.412878475, 10, 0), (0, 0, 270))):
            Circle(SKETCH10_R_2)
    extrude(amount=-CUT_EXTRUDE6_DEPTH, mode=Mode.SUBTRACT)

    # Sketch11 → Cut-Extrude7 (cut)
    with BuildSketch(Plane.XZ.offset(2)):
        with Locations((-35.462878475, -9.05)):
            Rectangle(SKETCH11_W, SKETCH11_H)
        with Locations((-35.462878475, 29.05)):
            Rectangle(SKETCH11_W, SKETCH11_H)
        with Locations((-20.462878475, -49.05)):
            Rectangle(SKETCH11_W, SKETCH11_H)
        with Locations((20.462878475, -49.05)):
            Rectangle(SKETCH11_W, SKETCH11_H)
        with Locations((35.462878475, -9.05)):
            Rectangle(SKETCH11_W, SKETCH11_H)
        with Locations((35.462878475, 49.05)):
            Rectangle(SKETCH11_W, SKETCH11_H)
    extrude(amount=-CUT_EXTRUDE7_DEPTH, mode=Mode.SUBTRACT)


solid = part.part
